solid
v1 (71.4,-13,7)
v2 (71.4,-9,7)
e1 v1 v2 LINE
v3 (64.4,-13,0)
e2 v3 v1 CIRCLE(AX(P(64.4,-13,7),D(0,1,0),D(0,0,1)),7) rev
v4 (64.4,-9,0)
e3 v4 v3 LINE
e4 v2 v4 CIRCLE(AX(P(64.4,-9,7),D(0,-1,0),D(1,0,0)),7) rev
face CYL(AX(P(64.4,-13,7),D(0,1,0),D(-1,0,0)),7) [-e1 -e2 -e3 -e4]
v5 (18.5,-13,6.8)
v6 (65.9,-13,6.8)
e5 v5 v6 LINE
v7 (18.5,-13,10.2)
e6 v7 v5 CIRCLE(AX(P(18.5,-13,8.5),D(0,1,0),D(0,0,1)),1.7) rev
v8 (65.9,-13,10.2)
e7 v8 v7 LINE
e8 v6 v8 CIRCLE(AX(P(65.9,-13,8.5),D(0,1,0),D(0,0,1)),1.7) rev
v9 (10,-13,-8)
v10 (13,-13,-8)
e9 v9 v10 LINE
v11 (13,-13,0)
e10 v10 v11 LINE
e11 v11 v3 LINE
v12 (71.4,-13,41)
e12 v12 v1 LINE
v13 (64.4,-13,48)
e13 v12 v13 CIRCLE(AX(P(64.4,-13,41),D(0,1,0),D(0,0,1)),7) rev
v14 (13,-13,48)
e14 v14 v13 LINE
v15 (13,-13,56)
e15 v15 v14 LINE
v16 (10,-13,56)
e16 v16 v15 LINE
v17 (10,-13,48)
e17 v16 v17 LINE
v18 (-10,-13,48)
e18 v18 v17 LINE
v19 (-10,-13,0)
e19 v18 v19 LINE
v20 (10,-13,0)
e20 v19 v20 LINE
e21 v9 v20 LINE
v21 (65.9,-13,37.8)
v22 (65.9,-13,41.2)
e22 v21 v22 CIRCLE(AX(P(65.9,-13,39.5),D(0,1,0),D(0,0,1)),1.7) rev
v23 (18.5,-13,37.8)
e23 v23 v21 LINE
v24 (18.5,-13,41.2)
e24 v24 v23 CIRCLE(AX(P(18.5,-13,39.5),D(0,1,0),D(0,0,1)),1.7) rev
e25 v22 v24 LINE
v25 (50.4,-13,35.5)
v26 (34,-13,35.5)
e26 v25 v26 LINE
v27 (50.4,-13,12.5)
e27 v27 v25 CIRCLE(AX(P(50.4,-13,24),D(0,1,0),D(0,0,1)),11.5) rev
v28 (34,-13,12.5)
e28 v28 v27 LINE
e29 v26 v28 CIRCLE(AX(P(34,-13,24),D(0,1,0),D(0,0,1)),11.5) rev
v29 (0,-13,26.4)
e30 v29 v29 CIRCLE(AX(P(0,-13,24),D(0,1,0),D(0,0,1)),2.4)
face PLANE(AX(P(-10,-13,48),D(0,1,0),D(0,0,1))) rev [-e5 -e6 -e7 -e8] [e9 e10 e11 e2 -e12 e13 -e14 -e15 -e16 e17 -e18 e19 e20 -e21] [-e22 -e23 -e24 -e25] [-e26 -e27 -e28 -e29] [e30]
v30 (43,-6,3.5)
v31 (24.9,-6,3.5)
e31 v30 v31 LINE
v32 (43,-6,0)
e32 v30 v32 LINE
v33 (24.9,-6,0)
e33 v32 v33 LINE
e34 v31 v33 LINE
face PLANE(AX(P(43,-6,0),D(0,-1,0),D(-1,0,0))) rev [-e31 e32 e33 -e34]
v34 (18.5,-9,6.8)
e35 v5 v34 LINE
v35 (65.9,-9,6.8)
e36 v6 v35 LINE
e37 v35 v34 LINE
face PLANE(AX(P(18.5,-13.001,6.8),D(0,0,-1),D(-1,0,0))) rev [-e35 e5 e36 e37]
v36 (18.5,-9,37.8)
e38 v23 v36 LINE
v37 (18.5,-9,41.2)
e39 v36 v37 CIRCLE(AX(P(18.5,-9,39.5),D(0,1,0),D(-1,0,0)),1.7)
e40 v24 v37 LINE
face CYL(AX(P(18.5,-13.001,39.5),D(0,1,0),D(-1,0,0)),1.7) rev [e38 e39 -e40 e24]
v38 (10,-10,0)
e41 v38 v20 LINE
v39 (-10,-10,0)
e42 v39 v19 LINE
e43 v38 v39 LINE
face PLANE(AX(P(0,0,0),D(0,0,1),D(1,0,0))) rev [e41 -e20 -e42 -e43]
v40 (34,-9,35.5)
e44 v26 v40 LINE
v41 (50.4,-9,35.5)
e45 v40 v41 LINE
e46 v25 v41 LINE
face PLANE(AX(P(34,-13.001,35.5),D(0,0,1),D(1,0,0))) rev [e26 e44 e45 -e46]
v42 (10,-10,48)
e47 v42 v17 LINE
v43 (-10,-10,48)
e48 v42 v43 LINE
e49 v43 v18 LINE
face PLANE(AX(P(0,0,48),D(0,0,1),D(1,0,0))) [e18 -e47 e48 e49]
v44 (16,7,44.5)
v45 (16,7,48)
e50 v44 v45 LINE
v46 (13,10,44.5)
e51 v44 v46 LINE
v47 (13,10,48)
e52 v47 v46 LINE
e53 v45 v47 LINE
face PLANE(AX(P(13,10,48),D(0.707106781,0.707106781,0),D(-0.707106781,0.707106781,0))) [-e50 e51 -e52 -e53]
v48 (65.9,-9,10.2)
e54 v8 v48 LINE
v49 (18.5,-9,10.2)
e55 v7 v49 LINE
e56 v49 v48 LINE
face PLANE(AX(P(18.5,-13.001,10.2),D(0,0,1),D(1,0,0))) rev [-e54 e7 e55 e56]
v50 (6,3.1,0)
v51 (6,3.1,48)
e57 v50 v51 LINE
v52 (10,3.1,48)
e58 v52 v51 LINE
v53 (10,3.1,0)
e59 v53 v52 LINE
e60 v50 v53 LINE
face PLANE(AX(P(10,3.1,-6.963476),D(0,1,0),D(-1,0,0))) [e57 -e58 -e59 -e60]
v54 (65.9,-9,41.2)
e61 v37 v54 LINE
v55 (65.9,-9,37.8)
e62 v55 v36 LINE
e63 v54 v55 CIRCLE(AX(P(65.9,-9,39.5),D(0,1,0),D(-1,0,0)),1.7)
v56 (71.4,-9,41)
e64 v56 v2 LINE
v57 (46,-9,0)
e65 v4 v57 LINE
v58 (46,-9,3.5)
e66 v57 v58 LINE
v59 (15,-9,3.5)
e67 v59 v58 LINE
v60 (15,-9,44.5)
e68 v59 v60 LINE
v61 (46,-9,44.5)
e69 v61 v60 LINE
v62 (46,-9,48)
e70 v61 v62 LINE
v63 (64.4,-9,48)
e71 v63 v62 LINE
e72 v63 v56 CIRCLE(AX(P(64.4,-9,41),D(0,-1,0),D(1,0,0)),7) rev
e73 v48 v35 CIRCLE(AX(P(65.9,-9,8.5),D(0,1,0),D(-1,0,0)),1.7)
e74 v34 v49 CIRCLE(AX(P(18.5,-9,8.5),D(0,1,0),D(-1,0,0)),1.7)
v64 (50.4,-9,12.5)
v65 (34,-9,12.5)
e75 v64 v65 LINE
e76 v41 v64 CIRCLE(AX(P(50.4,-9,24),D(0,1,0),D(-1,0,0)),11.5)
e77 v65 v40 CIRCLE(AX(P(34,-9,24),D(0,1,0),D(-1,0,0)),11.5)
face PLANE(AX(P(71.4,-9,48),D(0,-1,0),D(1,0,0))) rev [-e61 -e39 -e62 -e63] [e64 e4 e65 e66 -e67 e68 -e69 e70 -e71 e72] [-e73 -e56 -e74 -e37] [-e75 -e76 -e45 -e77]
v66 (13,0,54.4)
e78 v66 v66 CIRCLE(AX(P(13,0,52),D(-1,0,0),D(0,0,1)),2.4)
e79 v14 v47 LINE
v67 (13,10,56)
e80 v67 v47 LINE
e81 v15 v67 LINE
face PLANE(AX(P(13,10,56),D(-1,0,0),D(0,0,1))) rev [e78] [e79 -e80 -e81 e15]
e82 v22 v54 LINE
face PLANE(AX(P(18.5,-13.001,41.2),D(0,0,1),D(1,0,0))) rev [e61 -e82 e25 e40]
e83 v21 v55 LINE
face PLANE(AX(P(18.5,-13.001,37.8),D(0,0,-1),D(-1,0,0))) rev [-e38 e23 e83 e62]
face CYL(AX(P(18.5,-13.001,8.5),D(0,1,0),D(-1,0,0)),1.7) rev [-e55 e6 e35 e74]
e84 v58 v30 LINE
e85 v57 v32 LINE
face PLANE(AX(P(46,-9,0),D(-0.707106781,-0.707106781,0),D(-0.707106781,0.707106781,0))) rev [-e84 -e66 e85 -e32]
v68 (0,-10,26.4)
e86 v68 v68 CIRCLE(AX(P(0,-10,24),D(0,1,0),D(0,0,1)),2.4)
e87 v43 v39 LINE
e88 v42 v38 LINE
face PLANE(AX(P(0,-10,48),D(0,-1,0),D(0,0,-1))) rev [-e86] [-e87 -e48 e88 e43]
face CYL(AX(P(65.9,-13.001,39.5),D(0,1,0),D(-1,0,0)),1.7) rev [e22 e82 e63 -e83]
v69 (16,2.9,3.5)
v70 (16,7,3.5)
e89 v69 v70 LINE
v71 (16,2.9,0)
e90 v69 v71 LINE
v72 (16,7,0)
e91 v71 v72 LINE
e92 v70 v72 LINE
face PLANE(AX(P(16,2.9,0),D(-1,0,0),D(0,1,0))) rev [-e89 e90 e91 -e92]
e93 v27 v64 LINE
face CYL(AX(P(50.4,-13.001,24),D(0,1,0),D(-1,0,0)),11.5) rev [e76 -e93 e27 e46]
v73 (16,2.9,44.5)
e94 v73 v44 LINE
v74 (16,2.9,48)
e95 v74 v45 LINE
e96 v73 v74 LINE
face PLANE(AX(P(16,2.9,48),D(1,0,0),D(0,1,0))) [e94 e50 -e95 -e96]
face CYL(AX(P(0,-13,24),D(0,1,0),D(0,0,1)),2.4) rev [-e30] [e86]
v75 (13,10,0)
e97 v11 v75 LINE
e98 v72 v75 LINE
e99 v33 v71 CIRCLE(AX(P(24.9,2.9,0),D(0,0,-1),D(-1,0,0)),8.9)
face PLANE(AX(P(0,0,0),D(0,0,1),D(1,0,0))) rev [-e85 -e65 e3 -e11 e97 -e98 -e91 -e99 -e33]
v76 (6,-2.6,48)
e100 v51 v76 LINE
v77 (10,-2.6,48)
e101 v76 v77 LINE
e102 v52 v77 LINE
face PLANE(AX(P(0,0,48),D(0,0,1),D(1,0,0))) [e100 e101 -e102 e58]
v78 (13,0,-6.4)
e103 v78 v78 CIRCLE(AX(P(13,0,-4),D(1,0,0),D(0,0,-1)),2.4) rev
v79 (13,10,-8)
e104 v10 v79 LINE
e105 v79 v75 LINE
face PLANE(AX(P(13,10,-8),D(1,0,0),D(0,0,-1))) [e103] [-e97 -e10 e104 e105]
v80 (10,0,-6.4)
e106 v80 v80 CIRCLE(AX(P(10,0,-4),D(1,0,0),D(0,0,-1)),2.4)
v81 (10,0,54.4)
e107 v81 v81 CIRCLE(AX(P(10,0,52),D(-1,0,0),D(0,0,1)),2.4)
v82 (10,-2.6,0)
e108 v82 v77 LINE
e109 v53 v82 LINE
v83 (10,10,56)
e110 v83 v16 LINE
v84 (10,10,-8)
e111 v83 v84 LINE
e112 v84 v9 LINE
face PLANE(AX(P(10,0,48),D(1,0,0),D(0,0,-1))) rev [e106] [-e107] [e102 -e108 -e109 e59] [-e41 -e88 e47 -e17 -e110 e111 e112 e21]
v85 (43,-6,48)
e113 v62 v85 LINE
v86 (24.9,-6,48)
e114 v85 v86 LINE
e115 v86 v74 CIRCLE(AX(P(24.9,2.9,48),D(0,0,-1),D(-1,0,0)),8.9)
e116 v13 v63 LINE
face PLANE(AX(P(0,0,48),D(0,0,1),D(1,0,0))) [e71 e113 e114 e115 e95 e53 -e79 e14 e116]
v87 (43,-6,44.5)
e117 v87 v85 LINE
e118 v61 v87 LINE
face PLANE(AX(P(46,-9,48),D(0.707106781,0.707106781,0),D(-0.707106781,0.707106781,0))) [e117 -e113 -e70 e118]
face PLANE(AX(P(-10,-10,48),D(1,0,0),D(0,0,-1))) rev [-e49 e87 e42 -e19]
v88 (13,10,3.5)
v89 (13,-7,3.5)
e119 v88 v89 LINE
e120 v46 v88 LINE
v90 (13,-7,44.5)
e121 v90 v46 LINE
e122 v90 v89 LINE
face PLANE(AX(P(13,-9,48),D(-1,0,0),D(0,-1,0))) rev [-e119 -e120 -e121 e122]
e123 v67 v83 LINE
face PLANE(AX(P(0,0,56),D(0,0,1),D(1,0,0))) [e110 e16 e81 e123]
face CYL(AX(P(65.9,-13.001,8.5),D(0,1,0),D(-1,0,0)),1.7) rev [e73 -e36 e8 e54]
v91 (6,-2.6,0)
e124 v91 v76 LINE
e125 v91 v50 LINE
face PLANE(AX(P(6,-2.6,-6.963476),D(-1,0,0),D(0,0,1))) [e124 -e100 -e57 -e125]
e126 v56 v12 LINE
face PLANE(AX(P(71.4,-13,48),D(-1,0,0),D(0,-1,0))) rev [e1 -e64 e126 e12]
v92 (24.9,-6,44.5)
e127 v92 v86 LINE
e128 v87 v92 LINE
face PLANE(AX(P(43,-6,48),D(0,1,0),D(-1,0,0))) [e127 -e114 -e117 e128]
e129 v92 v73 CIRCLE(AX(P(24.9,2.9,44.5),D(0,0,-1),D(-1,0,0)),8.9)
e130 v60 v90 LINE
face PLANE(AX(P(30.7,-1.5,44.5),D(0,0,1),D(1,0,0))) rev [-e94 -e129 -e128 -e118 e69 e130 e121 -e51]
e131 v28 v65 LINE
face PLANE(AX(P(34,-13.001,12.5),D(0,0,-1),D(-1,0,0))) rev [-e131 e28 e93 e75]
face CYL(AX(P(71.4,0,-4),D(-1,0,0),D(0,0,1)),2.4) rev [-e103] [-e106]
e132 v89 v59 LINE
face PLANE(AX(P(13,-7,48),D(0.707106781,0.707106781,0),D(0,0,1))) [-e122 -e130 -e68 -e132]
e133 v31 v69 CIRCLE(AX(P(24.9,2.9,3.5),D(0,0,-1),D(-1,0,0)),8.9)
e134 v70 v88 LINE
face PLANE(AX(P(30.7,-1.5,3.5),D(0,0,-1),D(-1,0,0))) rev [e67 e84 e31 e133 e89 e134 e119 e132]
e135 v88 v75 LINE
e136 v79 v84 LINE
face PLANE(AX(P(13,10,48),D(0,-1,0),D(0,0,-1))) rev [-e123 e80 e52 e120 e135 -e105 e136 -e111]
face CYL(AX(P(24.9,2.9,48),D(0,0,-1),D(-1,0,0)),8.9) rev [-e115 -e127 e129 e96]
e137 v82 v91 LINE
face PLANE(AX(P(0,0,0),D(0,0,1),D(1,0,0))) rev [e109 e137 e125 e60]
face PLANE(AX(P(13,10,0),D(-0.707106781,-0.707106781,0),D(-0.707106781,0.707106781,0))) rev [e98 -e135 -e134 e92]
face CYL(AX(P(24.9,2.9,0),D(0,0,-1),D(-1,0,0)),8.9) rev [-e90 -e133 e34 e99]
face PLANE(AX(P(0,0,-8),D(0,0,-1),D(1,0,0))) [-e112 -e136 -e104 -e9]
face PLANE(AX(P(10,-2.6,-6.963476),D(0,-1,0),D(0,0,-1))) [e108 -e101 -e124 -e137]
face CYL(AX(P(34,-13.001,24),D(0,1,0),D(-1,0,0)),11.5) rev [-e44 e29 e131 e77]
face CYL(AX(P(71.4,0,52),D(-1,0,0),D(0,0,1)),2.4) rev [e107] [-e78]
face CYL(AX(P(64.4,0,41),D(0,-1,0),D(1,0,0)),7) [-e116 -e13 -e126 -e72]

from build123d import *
from OCP.BRepFilletAPI import BRepFilletAPI_MakeChamfer

# Parameters (mm, degrees)
EXTRUDE_1_DEPTH     = 48
SKETCH_3_R          = 2.4
CUT_EXTRUDE_2_DEPTH = 89.328704281
CUT_EXTRUDE_3_REACH = 90.108
CHAMFER_1_SIZE      = 0.2
FILLET_1_R          = 7
CUT_EXTRUDE_4_DEPTH = 88.011263639
FILLET_2_R          = 4
RIB_START           = -3.5
RIB_2_DEPTH         = 3.5
CHAMFER_2_SIZE      = 0.8
CHAMFER_2_SIZE2     = 0.291176187
CHAMFER_3_SIZE      = 0.8
CHAMFER_3_SIZE2     = 0.291176187
CHAMFER_4_SIZE      = 2
SKETCH_21_W         = 8.512208597
SKETCH_21_H         = 13.260826712
CUT_EXTRUDE_5_DEPTH = 88.011263639
SKETCH_22_W         = 4
SKETCH_22_H         = 5.7
EXTRUDE_4_DEPTH     = 48
SKETCH_23_W         = 3
SKETCH_23_H         = 23
EXTRUDE_5_DEPTH     = 8
SKETCH_25_R         = 2.4
CUT_EXTRUDE_6_DEPTH = 85.112781431


# Read off the part's stored shape, not the designer's step: 筋2
with BuildPart() as part:
    # 草图1 → 凸台-拉伸1 (new body)
    with BuildSketch(Plane.XY):
        Polygon((-10, -10), (-10, -13), (71.4, -13), (71.4, -9), (13, -9), (13, 10), (10, 10), (10, 2.95), (8, 2.95), (8, 4.75), (6.8, 4.75), (6, 3.95), (6, -3.95), (6.8, -4.75), (8, -4.75), (8, -2.95), (10, -2.95), (10, -10), align=None)
    extrude(amount=EXTRUDE_1_DEPTH)

    # 草图3 → 切除-拉伸2 (cut, through all)
    with BuildSketch(Plane(origin=(0, -10, 0), x_dir=(1, 0, 0), z_dir=(0, 1, 0))):
        with Locations(Location((0, -24, 0), (0, 0, 270))):
            Circle(SKETCH_3_R)
    extrude(amount=-CUT_EXTRUDE_2_DEPTH, mode=Mode.SUBTRACT)

    # 草图4 → 切除-拉伸3 (cut, up to next)
    with BuildSketch(Plane(origin=(0, -9, 0), x_dir=(1, 0, 0), z_dir=(0, 1, 0)), mode=Mode.PRIVATE) as cut_extrude_3_sk1:
        with BuildLine():
            Line((18.5, -6.8), (65.9, -6.8))
            ThreePointArc((65.9, -6.8), (67.6, -8.5), (65.9, -10.2))
            Line((65.9, -10.2), (18.5, -10.2))
            ThreePointArc((18.5, -10.2), (16.8, -8.5), (18.5, -6.8))
        make_face()
    cut_extrude_3_tool1 = extrude(cut_extrude_3_sk1.sketch, amount=-CUT_EXTRUDE_3_REACH, mode=Mode.PRIVATE) & part.part
    # 草图4 → 切除-拉伸3 (cut, up to next)
    with BuildSketch(Plane(origin=(0, -9, 0), x_dir=(1, 0, 0), z_dir=(0, 1, 0)), mode=Mode.PRIVATE) as cut_extrude_3_sk2:
        with BuildLine():
            Line((18.5, -37.8), (65.9, -37.8))
            ThreePointArc((65.9, -37.8), (67.6, -39.5), (65.9, -41.2))
            Line((65.9, -41.2), (18.5, -41.2))
            ThreePointArc((18.5, -41.2), (16.8, -39.5), (18.5, -37.8))
        make_face()
    cut_extrude_3_tool2 = extrude(cut_extrude_3_sk2.sketch, amount=-CUT_EXTRUDE_3_REACH, mode=Mode.PRIVATE) & part.part
    # 草图4 → 切除-拉伸3 (cut, up to next)
    with BuildSketch(Plane(origin=(0, -9, 0), x_dir=(1, 0, 0), z_dir=(0, 1, 0)), mode=Mode.PRIVATE) as cut_extrude_3_sk3:
        with BuildLine():
            Line((34, -12.5), (50.4, -12.5))
            ThreePointArc((50.4, -12.5), (61.9, -24), (50.4, -35.5))
            Line((50.4, -35.5), (34, -35.5))
            ThreePointArc((34, -35.5), (22.5, -24), (34, -12.5))
        make_face()
    cut_extrude_3_tool3 = extrude(cut_extrude_3_sk3.sketch, amount=-CUT_EXTRUDE_3_REACH, mode=Mode.PRIVATE) & part.part
    add(cut_extrude_3_tool1.solids().sort_by_distance((42.2, -9, 8.5))[0], mode=Mode.SUBTRACT)
    add(cut_extrude_3_tool2.solids().sort_by_distance((42.2, -9, 39.5))[0], mode=Mode.SUBTRACT)
    add(cut_extrude_3_tool3.solids().sort_by_distance((42.2, -9, 24))[0], mode=Mode.SUBTRACT)

    # 倒角1
    chamfer_1_edges = [part.edges().sort_by_distance(p)[0] for p in [
        (8, -2.95, 24),
        (8, -4.75, 24),
        (8, 4.75, 24),
        (8, 2.95, 24),
    ]]
    chamfer(chamfer_1_edges, length=CHAMFER_1_SIZE)

    # 圆角1
    fillet_1_edges = [part.edges().sort_by_distance(p)[0] for p in [
        (71.4, -11, 48),
        (71.4, -11, 0),
    ]]
    fillet(fillet_1_edges, radius=FILLET_1_R)

    # 草图11 → 切除-拉伸4 (cut, through all)
    with BuildSketch(Plane(origin=(0, 0, 0), x_dir=(-1, 0, 0), z_dir=(0, 0, -1))):
        Polygon((-10, -2.65), (-6, 0.706398525), (-6, -6.71507999), (-10, -6.71507999), align=None)
    extrude(amount=-CUT_EXTRUDE_4_DEPTH, mode=Mode.SUBTRACT)

    # 圆角2
    fillet_2_edges = [part.edges().sort_by_distance(p)[0] for p in [
        (6, 0.706398525, 24),
    ]]
    fillet(fillet_2_edges, radius=FILLET_2_R)

    # 筋2 outline → 筋2 (add)
    with BuildSketch(Plane.XY.offset(48).offset(RIB_START)):
        with BuildLine():
            Line((13, -9), (46, -9))
            Line((46, -9), (43, -6))
            Line((43, -6), (24.9, -6))
            ThreePointArc((24.9, -6), (18.606749647, -3.393250353), (16, 2.9))
            Line((16, 2.9), (16, 7))
            Line((16, 7), (13, 10))
            Line((13, 10), (13, -9))
        make_face()
    rib_2 = extrude(amount=RIB_2_DEPTH)

    # 镜向1: 筋2 across plane
    add(rib_2.mirror(Plane.XY.offset(24)))

    # 倒角2: one chamfer whose edges measure the first distance from different faces: ONE call of the kernel's chamfer builder (chamfer() names one face for all edges)
    chamfer_2_edges_1 = [part.edges().sort_by_distance(p)[0] for p in [
        (9.1, 2.95, 48),
    ]]
    chamfer_2_side_1 = [part.faces().sort_by_distance(p)[0] for p in [
        (9.1, 2.95, 24),
    ]]
    chamfer_2_edges_2 = [part.edges().sort_by_distance(p)[0] for p in [
        (8, 3.85, 48),
    ]]
    chamfer_2_side_2 = [part.faces().sort_by_distance(p)[0] for p in [
        (8, 3.85, 24),
    ]]
    chamfer_2_edges_3 = [part.edges().sort_by_distance(p)[0] for p in [
        (7.3, 4.75, 48),
    ]]
    chamfer_2_side_3 = [part.faces().sort_by_distance(p)[0] for p in [
        (7.3, 4.75, 24),
    ]]
    chamfer_2_edges_4 = [part.edges().sort_by_distance(p)[0] for p in [
        (7.9, 4.65, 48),
    ]]
    chamfer_2_side_4 = [part.faces().sort_by_distance(p)[0] for p in [
        (7.9, 4.65, 24),
    ]]
    chamfer_2_edges_5 = [part.edges().sort_by_distance(p)[0] for p in [
        (8.1, 3.05, 48),
    ]]
    chamfer_2_side_5 = [part.faces().sort_by_distance(p)[0] for p in [
        (8.1, 3.05, 24),
    ]]
    chamfer_2_edges_6 = [part.edges().sort_by_distance(p)[0] for p in [
        (8.714424781, -1.571274308, 48),
    ]]
    chamfer_2_side_6 = [part.faces().sort_by_distance(p)[0] for p in [
        (8.714424781, -1.571274308, 24),
    ]]
    chamfer_2_edges_7 = [part.edges().sort_by_distance(p)[0] for p in [
        (6.374768852, 0.88115611, 48),
    ]]
    chamfer_2_side_7 = [part.faces().sort_by_distance(p)[0] for p in [
        (6.374768852, 0.88115611, 24),
    ]]
    chamfer_2_edges_8 = [part.edges().sort_by_distance(p)[0] for p in [
        (6.4, 4.35, 48),
    ]]
    chamfer_2_side_8 = [part.faces().sort_by_distance(p)[0] for p in [
        (6.4, 4.35, 24),
    ]]
    chamfer_2_edges_9 = [part.edges().sort_by_distance(p)[0] for p in [
        (6, 3.260814579, 48),
    ]]
    chamfer_2_side_9 = [part.faces().sort_by_distance(p)[0] for p in [
        (6, 3.260814579, 24),
    ]]
    chamfer_2 = BRepFilletAPI_MakeChamfer(part.part.solid().wrapped)
    for e in chamfer_2_edges_1:
        chamfer_2.Add(CHAMFER_2_SIZE, CHAMFER_2_SIZE2, e.wrapped, chamfer_2_side_1[0].wrapped)  # the first distance lies on this face
    for e in chamfer_2_edges_2:
        chamfer_2.Add(CHAMFER_2_SIZE, CHAMFER_2_SIZE2, e.wrapped, chamfer_2_side_2[0].wrapped)  # the first distance lies on this face
    for e in chamfer_2_edges_3:
        chamfer_2.Add(CHAMFER_2_SIZE, CHAMFER_2_SIZE2, e.wrapped, chamfer_2_side_3[0].wrapped)  # the first distance lies on this face
    for e in chamfer_2_edges_4:
        chamfer_2.Add(CHAMFER_2_SIZE, CHAMFER_2_SIZE2, e.wrapped, chamfer_2_side_4[0].wrapped)  # the first distance lies on this face
    for e in chamfer_2_edges_5:
        chamfer_2.Add(CHAMFER_2_SIZE, CHAMFER_2_SIZE2, e.wrapped, chamfer_2_side_5[0].wrapped)  # the first distance lies on this face
    for e in chamfer_2_edges_6:
        chamfer_2.Add(CHAMFER_2_SIZE, CHAMFER_2_SIZE2, e.wrapped, chamfer_2_side_6[0].wrapped)  # the first distance lies on this face
    for e in chamfer_2_edges_7:
        chamfer_2.Add(CHAMFER_2_SIZE, CHAMFER_2_SIZE2, e.wrapped, chamfer_2_side_7[0].wrapped)  # the first distance lies on this face
    for e in chamfer_2_edges_8:
        chamfer_2.Add(CHAMFER_2_SIZE, CHAMFER_2_SIZE2, e.wrapped, chamfer_2_side_8[0].wrapped)  # the first distance lies on this face
    for e in chamfer_2_edges_9:
        chamfer_2.Add(CHAMFER_2_SIZE, CHAMFER_2_SIZE2, e.wrapped, chamfer_2_side_9[0].wrapped)  # the first distance lies on this face
    add(Compound.cast(chamfer_2.Shape()), mode=Mode.REPLACE)

    # 倒角3: one chamfer whose edges measure the first distance from different faces: ONE call of the kernel's chamfer builder (chamfer() names one face for all edges)
    chamfer_3_edges_1 = [part.edges().sort_by_distance(p)[0] for p in [
        (7.3, 4.75, 0),
    ]]
    chamfer_3_side_1 = [part.faces().sort_by_distance(p)[0] for p in [
        (7.3, 4.75, 23.6),
    ]]
    chamfer_3_edges_2 = [part.edges().sort_by_distance(p)[0] for p in [
        (8, 3.85, 0),
    ]]
    chamfer_3_side_2 = [part.faces().sort_by_distance(p)[0] for p in [
        (8, 3.85, 23.6),
    ]]
    chamfer_3_edges_3 = [part.edges().sort_by_distance(p)[0] for p in [
        (7.9, 4.65, 0),
    ]]
    chamfer_3_side_3 = [part.faces().sort_by_distance(p)[0] for p in [
        (7.9, 4.65, 23.6),
    ]]
    chamfer_3_edges_4 = [part.edges().sort_by_distance(p)[0] for p in [
        (8.1, 3.05, 0),
    ]]
    chamfer_3_side_4 = [part.faces().sort_by_distance(p)[0] for p in [
        (8.1, 3.05, 23.6),
    ]]
    chamfer_3_edges_5 = [part.edges().sort_by_distance(p)[0] for p in [
        (6, 3.260814579, 0),
    ]]
    chamfer_3_side_5 = [part.faces().sort_by_distance(p)[0] for p in [
        (6, 3.260814579, 23.6),
    ]]
    chamfer_3_edges_6 = [part.edges().sort_by_distance(p)[0] for p in [
        (6.4, 4.35, 0),
    ]]
    chamfer_3_side_6 = [part.faces().sort_by_distance(p)[0] for p in [
        (6.4, 4.35, 23.6),
    ]]
    chamfer_3_edges_7 = [part.edges().sort_by_distance(p)[0] for p in [
        (9.1, 2.95, 0),
    ]]
    chamfer_3_side_7 = [part.faces().sort_by_distance(p)[0] for p in [
        (9.1, 2.95, 23.6),
    ]]
    chamfer_3_edges_8 = [part.edges().sort_by_distance(p)[0] for p in [
        (8.714424781, -1.571274308, 0),
    ]]
    chamfer_3_side_8 = [part.faces().sort_by_distance(p)[0] for p in [
        (8.714424781, -1.571274308, 23.6),
    ]]
    chamfer_3_edges_9 = [part.edges().sort_by_distance(p)[0] for p in [
        (6.374768852, 0.88115611, 0),
    ]]
    chamfer_3_side_9 = [part.faces().sort_by_distance(p)[0] for p in [
        (6.374768852, 0.88115611, 23.6),
    ]]
    chamfer_3 = BRepFilletAPI_MakeChamfer(part.part.solid().wrapped)
    for e in chamfer_3_edges_1:
        chamfer_3.Add(CHAMFER_3_SIZE, CHAMFER_3_SIZE2, e.wrapped, chamfer_3_side_1[0].wrapped)  # the first distance lies on this face
    for e in chamfer_3_edges_2:
        chamfer_3.Add(CHAMFER_3_SIZE, CHAMFER_3_SIZE2, e.wrapped, chamfer_3_side_2[0].wrapped)  # the first distance lies on this face
    for e in chamfer_3_edges_3:
        chamfer_3.Add(CHAMFER_3_SIZE, CHAMFER_3_SIZE2, e.wrapped, chamfer_3_side_3[0].wrapped)  # the first distance lies on this face
    for e in chamfer_3_edges_4:
        chamfer_3.Add(CHAMFER_3_SIZE, CHAMFER_3_SIZE2, e.wrapped, chamfer_3_side_4[0].wrapped)  # the first distance lies on this face
    for e in chamfer_3_edges_5:
        chamfer_3.Add(CHAMFER_3_SIZE, CHAMFER_3_SIZE2, e.wrapped, chamfer_3_side_5[0].wrapped)  # the first distance lies on this face
    for e in chamfer_3_edges_6:
        chamfer_3.Add(CHAMFER_3_SIZE, CHAMFER_3_SIZE2, e.wrapped, chamfer_3_side_6[0].wrapped)  # the first distance lies on this face
    for e in chamfer_3_edges_7:
        chamfer_3.Add(CHAMFER_3_SIZE, CHAMFER_3_SIZE2, e.wrapped, chamfer_3_side_7[0].wrapped)  # the first distance lies on this face
    for e in chamfer_3_edges_8:
        chamfer_3.Add(CHAMFER_3_SIZE, CHAMFER_3_SIZE2, e.wrapped, chamfer_3_side_8[0].wrapped)  # the first distance lies on this face
    for e in chamfer_3_edges_9:
        chamfer_3.Add(CHAMFER_3_SIZE, CHAMFER_3_SIZE2, e.wrapped, chamfer_3_side_9[0].wrapped)  # the first distance lies on this face
    add(Compound.cast(chamfer_3.Shape()), mode=Mode.REPLACE)

    # 倒角4
    chamfer_4_edges = [part.edges().sort_by_distance(p)[0] for p in [
        (13, -9, 24),
    ]]
    chamfer(chamfer_4_edges, length=CHAMFER_4_SIZE)

    # 草图21 → 切除-拉伸5 (cut, through all)
    with BuildSketch(Plane.XY.offset(48)):
        with Locations((5.743895701, 1.572706777)):
            Rectangle(SKETCH_21_W, SKETCH_21_H)
    extrude(amount=-CUT_EXTRUDE_5_DEPTH, mode=Mode.SUBTRACT)

    # 草图22 → 凸台-拉伸4 (add)
    with BuildSketch(Plane.XY.offset(48)):
        with Locations((8, 0.25)):
            Rectangle(SKETCH_22_W, SKETCH_22_H)
    extrude(amount=-EXTRUDE_4_DEPTH)

    # 草图23 → 凸台-拉伸5 (add)
    with BuildSketch(Plane.XY.offset(48)):
        with Locations((11.5, -1.5)):
            Rectangle(SKETCH_23_W, SKETCH_23_H)
    extrude_5 = extrude(amount=EXTRUDE_5_DEPTH)

    # 草图25 → 切除-拉伸6 (cut, through all)
    with BuildSketch(Plane.ZY.offset(-10)):
        with Locations((52, 0)):
            Circle(SKETCH_25_R)
    cut_extrude_6 = extrude(amount=-CUT_EXTRUDE_6_DEPTH, mode=Mode.SUBTRACT)

    # 镜向2: 凸台-拉伸5, 切除-拉伸6 across plane
    add(extrude_5.mirror(Plane.XY.offset(24)))
    add(cut_extrude_6.mirror(Plane.XY.offset(24)), mode=Mode.SUBTRACT)


solid = part.part
